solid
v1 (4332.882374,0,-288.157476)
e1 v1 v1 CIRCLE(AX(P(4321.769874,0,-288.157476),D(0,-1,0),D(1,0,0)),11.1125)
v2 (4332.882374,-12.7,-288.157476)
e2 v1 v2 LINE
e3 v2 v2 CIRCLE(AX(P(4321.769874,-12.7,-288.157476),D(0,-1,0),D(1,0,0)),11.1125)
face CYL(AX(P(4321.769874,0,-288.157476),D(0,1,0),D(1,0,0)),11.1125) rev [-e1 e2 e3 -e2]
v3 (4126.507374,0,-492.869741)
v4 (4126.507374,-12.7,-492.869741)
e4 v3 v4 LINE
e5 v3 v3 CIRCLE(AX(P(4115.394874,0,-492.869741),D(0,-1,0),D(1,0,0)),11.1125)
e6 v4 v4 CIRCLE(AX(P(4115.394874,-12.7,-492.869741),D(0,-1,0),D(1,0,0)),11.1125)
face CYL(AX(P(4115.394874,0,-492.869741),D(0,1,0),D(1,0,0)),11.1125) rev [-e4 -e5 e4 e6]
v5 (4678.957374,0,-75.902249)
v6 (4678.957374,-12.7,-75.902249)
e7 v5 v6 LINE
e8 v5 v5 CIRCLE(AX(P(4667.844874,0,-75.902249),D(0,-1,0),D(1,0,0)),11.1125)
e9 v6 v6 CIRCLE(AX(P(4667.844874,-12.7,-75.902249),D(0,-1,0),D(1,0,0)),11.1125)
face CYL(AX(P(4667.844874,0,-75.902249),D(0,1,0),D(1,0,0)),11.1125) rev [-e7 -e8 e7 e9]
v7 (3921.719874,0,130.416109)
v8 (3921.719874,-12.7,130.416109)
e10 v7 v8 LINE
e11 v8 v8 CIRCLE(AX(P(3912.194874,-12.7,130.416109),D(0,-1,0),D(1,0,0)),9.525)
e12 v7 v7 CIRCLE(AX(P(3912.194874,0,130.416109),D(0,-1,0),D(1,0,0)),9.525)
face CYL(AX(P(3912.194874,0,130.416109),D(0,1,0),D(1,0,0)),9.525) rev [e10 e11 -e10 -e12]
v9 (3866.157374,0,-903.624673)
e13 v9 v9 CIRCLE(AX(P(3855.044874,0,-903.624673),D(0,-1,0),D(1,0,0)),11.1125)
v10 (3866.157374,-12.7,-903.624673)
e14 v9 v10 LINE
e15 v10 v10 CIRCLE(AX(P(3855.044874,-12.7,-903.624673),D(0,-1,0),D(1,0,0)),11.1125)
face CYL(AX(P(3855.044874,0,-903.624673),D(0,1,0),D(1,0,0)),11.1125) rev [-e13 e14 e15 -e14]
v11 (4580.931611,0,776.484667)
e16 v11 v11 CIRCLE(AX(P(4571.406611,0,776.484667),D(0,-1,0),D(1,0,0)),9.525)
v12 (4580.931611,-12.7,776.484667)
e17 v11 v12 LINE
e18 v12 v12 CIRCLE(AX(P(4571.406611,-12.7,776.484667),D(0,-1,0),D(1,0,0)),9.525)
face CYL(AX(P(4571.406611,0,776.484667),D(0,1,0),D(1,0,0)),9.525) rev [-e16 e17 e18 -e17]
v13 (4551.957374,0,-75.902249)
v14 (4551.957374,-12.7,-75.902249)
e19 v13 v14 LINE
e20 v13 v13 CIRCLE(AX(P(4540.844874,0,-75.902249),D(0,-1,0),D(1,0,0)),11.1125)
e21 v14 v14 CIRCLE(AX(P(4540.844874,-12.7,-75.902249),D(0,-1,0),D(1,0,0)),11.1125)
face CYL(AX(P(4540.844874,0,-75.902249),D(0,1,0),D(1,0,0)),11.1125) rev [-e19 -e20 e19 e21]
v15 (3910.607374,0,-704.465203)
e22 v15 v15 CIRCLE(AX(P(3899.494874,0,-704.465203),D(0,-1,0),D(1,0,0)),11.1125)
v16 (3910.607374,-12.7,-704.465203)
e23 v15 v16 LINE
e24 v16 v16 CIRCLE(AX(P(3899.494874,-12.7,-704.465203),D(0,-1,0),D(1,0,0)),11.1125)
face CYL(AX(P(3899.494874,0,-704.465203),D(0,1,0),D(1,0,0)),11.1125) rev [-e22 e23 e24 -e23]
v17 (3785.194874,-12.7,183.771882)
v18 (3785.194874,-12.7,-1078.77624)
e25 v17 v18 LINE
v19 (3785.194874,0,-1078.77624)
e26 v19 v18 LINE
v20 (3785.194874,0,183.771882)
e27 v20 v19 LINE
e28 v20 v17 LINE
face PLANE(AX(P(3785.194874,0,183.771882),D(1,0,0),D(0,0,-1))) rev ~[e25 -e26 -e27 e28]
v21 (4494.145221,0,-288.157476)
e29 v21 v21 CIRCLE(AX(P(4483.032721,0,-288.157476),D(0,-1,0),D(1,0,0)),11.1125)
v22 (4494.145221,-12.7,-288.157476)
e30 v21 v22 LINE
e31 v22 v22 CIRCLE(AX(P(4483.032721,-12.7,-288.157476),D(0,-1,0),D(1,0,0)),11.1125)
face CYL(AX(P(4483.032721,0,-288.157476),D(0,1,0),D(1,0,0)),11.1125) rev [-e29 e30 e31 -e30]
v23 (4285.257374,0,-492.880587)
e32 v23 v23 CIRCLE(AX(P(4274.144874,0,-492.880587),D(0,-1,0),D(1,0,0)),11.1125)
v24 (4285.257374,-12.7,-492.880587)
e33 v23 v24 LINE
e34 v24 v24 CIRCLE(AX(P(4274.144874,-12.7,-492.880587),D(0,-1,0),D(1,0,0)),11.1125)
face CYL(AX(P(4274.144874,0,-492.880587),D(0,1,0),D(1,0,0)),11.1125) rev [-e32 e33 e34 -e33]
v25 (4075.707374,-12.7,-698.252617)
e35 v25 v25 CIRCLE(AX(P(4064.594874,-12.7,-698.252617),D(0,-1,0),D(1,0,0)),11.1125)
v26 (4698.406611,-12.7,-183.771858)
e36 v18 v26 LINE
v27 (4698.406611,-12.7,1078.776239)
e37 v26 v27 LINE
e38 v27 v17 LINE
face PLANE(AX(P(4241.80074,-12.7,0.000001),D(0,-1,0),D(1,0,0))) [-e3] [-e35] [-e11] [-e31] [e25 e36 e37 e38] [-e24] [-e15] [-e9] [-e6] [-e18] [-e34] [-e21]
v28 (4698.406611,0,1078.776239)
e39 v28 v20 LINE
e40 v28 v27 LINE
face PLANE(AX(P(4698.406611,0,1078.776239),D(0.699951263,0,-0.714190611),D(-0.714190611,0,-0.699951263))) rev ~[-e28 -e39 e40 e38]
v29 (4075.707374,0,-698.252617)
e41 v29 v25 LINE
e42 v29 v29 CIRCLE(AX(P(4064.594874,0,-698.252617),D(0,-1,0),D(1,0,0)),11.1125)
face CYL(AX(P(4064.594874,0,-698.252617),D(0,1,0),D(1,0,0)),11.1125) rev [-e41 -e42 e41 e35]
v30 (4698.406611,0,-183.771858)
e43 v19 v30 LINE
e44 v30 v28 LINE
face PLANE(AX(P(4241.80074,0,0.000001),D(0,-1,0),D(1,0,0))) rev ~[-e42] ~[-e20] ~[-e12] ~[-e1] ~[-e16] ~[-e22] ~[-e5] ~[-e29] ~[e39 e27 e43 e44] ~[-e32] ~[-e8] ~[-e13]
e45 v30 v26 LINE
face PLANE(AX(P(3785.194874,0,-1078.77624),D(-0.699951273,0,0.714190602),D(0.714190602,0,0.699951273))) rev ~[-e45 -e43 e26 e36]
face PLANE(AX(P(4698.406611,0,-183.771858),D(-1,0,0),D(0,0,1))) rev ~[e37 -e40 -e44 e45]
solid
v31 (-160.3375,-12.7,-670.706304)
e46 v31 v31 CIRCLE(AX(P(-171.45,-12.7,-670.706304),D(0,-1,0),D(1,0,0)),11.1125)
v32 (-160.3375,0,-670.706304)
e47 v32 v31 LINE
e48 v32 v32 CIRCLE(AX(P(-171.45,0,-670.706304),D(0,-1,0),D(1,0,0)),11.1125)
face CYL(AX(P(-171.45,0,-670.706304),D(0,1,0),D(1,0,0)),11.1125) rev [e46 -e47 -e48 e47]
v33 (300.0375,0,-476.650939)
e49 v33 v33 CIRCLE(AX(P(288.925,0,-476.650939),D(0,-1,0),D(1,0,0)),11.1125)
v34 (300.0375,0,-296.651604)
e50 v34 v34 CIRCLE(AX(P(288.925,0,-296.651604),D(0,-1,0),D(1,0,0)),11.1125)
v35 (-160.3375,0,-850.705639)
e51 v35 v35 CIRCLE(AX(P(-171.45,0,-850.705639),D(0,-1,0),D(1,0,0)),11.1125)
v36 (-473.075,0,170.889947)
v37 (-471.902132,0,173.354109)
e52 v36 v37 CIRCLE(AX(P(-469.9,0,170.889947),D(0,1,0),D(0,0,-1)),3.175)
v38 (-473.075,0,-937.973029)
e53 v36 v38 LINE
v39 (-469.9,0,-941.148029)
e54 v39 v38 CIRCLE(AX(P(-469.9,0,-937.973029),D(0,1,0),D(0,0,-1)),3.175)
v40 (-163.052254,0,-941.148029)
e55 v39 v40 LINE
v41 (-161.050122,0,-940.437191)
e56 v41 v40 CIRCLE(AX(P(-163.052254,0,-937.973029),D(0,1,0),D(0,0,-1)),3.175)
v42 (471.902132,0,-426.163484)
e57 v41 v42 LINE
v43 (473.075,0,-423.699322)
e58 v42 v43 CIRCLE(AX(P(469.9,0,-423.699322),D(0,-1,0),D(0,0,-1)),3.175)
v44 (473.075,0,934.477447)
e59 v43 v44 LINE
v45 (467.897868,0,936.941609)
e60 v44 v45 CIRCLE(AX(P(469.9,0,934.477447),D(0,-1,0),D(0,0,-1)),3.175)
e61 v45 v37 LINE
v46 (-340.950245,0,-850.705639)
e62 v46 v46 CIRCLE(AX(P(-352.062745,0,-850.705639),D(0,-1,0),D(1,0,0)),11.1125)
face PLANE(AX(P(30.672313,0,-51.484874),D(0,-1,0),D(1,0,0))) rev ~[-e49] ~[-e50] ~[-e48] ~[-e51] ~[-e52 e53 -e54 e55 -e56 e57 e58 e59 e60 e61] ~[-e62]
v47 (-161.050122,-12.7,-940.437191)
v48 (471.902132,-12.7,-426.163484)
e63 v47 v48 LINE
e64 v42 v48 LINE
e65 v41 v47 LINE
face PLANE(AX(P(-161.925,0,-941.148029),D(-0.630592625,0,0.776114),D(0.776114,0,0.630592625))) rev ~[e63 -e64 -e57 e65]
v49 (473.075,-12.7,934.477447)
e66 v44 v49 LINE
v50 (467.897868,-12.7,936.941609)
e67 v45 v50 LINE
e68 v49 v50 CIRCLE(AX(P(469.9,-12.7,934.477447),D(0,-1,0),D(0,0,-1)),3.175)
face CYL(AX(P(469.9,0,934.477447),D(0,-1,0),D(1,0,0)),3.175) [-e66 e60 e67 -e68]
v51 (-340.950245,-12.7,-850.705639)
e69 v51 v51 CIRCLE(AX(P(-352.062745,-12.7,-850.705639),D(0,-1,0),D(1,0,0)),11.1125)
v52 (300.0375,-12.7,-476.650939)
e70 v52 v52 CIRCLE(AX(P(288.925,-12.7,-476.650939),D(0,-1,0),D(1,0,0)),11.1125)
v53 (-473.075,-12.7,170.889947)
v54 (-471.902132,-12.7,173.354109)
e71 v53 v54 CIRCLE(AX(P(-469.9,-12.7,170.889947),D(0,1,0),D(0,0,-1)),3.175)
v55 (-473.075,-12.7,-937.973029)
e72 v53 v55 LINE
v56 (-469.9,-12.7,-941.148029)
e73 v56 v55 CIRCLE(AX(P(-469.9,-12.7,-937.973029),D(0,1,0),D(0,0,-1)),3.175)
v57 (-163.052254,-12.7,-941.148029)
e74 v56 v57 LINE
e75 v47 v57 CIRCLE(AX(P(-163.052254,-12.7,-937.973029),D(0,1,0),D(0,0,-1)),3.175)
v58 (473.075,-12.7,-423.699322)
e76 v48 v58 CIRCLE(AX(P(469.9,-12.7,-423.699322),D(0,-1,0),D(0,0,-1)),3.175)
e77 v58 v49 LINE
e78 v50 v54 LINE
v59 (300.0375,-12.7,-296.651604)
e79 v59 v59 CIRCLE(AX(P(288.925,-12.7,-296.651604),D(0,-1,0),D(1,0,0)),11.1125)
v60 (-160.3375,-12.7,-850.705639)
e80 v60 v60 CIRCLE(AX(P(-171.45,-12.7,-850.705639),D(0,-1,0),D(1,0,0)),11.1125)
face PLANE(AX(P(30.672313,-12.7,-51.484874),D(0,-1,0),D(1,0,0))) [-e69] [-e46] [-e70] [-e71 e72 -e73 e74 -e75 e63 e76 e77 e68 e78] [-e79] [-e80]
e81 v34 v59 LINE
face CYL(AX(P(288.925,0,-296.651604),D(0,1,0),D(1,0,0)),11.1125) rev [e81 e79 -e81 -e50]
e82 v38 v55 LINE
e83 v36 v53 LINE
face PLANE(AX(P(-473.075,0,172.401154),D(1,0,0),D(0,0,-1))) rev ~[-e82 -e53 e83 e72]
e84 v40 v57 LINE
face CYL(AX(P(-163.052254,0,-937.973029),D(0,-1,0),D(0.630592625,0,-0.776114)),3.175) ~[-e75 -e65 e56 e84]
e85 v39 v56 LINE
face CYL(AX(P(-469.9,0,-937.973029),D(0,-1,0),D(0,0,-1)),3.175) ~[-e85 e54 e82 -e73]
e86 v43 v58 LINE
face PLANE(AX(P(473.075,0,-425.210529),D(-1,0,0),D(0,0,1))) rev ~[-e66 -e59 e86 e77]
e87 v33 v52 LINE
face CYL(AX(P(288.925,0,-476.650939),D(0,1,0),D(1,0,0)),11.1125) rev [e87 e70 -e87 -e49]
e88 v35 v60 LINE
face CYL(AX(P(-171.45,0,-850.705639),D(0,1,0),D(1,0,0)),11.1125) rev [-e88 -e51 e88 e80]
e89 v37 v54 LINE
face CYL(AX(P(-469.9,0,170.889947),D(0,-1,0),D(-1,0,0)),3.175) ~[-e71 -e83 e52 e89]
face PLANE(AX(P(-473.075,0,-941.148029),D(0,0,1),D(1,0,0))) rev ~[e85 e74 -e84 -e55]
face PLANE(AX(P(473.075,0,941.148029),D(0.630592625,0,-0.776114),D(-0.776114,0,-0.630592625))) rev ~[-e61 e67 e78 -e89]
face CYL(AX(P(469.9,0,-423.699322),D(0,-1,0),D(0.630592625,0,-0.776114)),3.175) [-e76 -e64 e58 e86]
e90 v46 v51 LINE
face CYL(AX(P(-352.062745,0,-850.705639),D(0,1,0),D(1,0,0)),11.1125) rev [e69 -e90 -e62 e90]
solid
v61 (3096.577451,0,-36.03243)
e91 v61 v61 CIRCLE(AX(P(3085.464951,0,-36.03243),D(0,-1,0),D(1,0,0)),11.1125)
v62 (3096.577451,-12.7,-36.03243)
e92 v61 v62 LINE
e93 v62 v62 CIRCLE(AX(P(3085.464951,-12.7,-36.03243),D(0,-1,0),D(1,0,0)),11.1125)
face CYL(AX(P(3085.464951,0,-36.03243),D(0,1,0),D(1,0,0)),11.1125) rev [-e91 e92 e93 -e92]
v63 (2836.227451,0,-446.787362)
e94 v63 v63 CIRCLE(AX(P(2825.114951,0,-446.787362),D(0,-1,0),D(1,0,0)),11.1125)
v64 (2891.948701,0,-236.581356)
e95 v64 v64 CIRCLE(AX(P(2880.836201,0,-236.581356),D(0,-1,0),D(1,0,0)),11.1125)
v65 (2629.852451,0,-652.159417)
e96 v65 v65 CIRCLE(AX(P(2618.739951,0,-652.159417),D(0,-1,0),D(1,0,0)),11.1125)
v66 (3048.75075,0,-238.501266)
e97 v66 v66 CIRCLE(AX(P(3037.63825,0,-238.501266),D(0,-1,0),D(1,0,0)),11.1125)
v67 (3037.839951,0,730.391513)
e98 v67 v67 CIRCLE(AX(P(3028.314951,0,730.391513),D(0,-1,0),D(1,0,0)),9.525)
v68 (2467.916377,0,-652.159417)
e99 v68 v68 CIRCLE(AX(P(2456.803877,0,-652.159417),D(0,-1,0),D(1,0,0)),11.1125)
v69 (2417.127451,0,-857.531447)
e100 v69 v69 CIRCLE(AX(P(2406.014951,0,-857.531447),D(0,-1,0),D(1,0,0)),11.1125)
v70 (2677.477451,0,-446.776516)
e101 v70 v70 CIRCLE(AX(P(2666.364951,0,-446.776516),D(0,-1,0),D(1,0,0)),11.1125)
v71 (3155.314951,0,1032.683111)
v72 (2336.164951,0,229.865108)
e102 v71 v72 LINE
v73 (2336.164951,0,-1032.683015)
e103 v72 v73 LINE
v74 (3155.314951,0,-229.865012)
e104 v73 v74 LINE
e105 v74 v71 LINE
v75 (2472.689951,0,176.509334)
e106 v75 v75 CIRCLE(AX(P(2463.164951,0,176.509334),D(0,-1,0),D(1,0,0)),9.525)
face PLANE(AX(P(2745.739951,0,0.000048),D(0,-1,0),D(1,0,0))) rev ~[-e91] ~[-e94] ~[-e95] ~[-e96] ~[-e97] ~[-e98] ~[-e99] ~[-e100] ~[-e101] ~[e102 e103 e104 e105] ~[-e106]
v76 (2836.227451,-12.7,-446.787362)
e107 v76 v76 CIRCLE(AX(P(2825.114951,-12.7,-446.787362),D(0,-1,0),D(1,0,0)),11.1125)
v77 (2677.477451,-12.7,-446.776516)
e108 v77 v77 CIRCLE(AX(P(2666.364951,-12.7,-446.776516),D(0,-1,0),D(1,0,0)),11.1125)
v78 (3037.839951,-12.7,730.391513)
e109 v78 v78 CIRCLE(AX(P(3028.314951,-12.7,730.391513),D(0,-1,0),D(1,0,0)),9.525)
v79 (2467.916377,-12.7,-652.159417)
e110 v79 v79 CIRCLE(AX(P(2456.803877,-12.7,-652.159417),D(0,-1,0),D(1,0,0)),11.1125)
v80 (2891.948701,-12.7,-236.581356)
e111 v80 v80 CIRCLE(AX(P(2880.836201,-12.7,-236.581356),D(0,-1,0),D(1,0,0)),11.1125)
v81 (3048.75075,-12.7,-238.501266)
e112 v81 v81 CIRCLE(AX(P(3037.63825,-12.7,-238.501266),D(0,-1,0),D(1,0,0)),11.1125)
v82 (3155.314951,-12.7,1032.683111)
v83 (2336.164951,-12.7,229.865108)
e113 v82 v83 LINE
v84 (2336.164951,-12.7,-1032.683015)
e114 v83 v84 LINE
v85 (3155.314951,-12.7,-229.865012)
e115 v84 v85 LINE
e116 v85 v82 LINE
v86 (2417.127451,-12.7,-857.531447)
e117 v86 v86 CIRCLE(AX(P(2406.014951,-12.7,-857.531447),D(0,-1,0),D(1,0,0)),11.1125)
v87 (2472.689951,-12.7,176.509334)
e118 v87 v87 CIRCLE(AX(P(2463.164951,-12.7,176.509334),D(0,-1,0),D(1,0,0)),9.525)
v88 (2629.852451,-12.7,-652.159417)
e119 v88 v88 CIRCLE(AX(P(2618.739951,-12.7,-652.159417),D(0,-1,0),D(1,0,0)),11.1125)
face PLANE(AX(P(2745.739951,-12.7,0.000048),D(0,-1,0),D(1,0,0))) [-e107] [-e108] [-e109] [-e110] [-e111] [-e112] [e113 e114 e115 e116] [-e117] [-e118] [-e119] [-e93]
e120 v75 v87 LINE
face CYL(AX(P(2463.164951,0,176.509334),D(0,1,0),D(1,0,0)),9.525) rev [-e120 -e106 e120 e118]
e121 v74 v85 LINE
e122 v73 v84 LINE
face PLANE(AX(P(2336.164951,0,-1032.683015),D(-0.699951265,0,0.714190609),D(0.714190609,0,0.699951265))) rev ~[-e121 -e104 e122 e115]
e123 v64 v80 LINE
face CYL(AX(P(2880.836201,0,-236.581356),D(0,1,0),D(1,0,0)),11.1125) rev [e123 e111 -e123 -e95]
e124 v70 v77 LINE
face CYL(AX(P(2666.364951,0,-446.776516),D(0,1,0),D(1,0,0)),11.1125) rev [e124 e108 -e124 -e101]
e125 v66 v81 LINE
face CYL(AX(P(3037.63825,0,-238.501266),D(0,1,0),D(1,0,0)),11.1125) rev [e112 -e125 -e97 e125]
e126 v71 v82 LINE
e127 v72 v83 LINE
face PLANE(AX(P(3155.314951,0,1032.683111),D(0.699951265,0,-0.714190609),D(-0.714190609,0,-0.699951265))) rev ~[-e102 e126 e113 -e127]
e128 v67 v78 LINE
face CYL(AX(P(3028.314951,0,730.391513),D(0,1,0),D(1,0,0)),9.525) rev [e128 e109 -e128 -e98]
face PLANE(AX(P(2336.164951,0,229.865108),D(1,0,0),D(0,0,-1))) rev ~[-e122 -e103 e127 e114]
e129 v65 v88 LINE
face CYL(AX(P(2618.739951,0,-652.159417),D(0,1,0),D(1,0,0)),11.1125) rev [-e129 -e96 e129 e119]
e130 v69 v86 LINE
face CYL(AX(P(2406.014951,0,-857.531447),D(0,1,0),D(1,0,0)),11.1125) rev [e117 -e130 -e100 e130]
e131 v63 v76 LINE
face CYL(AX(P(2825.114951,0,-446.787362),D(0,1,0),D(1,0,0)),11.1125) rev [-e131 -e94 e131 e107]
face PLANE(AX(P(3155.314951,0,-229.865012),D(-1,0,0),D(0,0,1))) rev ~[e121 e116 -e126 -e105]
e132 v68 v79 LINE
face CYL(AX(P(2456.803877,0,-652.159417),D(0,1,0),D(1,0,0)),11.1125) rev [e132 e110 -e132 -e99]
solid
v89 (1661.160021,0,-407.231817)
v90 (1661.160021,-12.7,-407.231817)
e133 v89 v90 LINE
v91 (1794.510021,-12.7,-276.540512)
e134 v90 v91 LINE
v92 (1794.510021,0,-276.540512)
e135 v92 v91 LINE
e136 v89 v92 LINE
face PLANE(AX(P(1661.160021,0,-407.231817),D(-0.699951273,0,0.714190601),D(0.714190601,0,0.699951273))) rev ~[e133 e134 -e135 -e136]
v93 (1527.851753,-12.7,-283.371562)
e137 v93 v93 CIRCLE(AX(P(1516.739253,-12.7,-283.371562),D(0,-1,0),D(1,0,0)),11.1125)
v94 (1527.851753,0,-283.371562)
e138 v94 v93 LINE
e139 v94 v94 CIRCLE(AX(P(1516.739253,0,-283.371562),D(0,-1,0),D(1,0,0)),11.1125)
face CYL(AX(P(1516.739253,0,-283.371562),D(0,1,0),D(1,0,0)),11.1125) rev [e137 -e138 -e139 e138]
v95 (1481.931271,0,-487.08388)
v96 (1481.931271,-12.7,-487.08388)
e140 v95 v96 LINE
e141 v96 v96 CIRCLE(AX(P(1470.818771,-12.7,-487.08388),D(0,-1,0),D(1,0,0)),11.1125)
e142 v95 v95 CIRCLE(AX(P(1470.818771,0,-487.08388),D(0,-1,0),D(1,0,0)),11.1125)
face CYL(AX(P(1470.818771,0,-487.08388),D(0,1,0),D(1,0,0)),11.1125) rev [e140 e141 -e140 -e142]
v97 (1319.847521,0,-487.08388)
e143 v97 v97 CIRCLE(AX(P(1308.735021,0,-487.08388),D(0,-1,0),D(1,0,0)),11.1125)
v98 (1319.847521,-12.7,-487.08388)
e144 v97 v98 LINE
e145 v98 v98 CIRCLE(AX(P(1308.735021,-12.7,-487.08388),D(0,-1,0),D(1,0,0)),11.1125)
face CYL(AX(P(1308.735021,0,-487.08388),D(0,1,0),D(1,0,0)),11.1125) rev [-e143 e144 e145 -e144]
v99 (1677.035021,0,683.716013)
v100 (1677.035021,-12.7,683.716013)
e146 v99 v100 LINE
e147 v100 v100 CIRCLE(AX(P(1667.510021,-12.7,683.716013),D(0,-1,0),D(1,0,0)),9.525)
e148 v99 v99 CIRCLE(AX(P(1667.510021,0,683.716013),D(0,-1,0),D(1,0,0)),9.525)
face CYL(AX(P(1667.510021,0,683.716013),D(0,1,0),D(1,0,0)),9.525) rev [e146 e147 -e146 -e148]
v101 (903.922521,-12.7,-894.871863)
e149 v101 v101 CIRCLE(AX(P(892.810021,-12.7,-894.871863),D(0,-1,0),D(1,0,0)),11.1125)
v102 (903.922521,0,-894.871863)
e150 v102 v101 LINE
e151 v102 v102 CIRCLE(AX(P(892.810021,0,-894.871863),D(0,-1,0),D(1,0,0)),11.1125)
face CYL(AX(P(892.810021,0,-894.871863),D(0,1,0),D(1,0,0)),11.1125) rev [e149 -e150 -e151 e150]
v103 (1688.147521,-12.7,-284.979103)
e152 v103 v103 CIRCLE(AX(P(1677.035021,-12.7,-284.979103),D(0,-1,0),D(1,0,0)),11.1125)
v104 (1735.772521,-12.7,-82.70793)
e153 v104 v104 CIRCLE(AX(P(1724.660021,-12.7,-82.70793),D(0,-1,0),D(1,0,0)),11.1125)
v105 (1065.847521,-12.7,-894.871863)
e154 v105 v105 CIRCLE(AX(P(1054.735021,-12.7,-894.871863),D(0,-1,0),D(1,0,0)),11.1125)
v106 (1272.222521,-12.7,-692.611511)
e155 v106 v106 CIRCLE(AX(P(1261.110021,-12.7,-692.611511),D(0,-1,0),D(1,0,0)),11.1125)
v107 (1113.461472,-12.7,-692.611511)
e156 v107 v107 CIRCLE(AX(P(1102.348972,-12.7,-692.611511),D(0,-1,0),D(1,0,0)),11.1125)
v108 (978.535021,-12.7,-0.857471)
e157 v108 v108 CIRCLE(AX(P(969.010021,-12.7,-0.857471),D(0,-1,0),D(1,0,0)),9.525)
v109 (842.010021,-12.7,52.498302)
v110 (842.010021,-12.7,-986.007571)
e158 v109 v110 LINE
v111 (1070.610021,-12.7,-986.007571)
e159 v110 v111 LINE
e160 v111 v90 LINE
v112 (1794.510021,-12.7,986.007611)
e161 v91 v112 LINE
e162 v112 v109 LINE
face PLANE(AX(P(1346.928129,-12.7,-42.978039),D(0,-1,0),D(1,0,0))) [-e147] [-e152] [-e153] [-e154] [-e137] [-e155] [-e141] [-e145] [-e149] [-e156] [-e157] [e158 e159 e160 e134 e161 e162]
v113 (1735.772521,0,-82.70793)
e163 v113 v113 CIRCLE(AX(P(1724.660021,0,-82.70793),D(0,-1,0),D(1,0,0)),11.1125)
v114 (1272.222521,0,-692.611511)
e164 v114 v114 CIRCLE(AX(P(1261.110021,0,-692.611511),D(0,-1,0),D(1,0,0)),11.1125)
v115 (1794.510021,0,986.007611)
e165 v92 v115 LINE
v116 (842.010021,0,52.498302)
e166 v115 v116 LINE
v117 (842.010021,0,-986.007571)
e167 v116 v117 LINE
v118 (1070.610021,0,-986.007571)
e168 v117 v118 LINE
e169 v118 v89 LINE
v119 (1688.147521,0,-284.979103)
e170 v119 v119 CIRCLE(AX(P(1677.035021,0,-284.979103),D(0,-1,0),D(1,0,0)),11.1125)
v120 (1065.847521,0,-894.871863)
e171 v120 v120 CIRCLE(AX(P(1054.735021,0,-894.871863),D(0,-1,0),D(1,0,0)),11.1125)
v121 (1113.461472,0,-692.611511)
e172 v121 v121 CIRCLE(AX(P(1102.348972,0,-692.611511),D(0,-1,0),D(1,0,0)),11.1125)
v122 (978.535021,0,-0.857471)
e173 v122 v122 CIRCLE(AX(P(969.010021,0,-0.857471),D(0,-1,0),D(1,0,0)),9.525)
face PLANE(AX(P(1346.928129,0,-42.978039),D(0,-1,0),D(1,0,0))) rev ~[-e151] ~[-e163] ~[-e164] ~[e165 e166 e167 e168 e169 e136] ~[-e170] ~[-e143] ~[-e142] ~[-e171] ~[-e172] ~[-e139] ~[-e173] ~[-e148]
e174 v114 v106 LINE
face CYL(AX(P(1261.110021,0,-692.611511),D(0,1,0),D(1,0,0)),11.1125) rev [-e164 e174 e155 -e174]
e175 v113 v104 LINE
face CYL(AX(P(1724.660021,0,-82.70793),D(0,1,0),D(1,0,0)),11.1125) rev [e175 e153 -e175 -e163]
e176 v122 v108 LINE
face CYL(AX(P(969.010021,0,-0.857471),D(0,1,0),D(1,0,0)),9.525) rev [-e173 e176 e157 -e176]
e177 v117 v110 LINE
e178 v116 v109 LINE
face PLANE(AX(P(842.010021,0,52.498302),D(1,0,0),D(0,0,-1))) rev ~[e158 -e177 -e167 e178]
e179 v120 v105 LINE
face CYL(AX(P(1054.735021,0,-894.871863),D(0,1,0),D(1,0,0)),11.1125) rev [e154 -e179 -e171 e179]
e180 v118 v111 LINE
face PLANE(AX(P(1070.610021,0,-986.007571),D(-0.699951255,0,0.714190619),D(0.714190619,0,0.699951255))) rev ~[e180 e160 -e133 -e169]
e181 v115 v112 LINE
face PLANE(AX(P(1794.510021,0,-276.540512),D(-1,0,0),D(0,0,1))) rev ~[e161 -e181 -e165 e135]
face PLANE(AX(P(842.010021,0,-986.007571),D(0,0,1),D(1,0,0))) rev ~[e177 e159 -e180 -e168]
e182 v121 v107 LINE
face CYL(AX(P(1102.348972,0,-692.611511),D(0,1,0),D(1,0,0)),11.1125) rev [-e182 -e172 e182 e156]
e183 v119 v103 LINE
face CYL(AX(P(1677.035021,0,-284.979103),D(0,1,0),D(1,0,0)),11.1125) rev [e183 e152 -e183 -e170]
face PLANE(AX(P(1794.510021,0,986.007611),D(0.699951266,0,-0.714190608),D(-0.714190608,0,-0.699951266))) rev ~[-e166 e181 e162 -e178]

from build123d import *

# Parameters (mm, degrees)
F0_R     = 11.1125
F1_DEPTH = 12.7
F2_R     = 3.175
F3_R     = 11.1125
F3_R_2   = 9.525
F4_DEPTH = 12.7
F5_R     = 11.1125
F5_R_2   = 9.525
F6_DEPTH = 12.7
F7_R     = 11.1125
F7_R_2   = 9.525
F8_DEPTH = 12.7


# Not quite as in the source:
# - ends of sketch curves that miss each other by under 0.0002 mm in the source are joined


with BuildPart() as f1:
    # F0 (on Front) → F1 (new body)
    with BuildSketch(Plane.XZ):
        Polygon((-161.925, -941.1480288), (473.075, -425.2105288), (473.075, 941.1480288), (-473.075, 172.4011538), (-473.075, -941.1480288), align=None)
        with Locations((-352.0627452, -850.7056392)):
            Circle(F0_R, mode=Mode.SUBTRACT)
        with Locations((-171.45, -850.7056392)):
            Circle(F0_R, mode=Mode.SUBTRACT)
        with Locations((-171.45, -670.706304)):
            Circle(F0_R, mode=Mode.SUBTRACT)
        with Locations((288.925, -476.650939)):
            Circle(F0_R, mode=Mode.SUBTRACT)
        with Locations((288.925, -296.6516038)):
            Circle(F0_R, mode=Mode.SUBTRACT)
    extrude(amount=F1_DEPTH)

    # F2
    f2_edges = [f1.edges().sort_by_distance(p)[0] for p in [
        (473.075, -6.35, 941.148029),
        (-473.075, -6.35, 172.401154),
        (-473.075, -6.35, -941.148029),
        (-161.925, -6.35, -941.148029),
        (473.075, -6.35, -425.210529),
    ]]
    fillet(f2_edges, radius=F2_R)


with BuildPart() as f4:
    # F3 (on Front) → F4 (new body)
    with BuildSketch(Plane.XZ):
        Polygon((1070.6100212097, -986.0075712204), (1661.1600212097, -407.2318174204), (1794.5100212097, -276.5405116204), (1794.5100212097, 986.0076109796), (842.0100212097, 52.4983019796), (842.0100212097, -986.0075712204), align=None)
        with Locations((892.8100212097, -894.8718632204)):
            Circle(F3_R, mode=Mode.SUBTRACT)
        with Locations((1054.7350212097, -894.8718632204)):
            Circle(F3_R, mode=Mode.SUBTRACT)
        with Locations((1102.3489722097, -692.6115108204)):
            Circle(F3_R, mode=Mode.SUBTRACT)
        with Locations((1261.1100212097, -692.6115108204)):
            Circle(F3_R, mode=Mode.SUBTRACT)
        with Locations((969.0100212097, -0.8574714204)):
            Circle(F3_R_2, mode=Mode.SUBTRACT)
        with Locations((1308.7350212097, -487.0838802204)):
            Circle(F3_R, mode=Mode.SUBTRACT)
        with Locations((1470.8187712097, -487.0838802204)):
            Circle(F3_R, mode=Mode.SUBTRACT)
        with Locations((1516.7392534097, -283.3715622204)):
            Circle(F3_R, mode=Mode.SUBTRACT)
        with Locations((1677.0350212097, -284.9791028204)):
            Circle(F3_R, mode=Mode.SUBTRACT)
        with Locations((1724.6600212097, -82.7079300204)):
            Circle(F3_R, mode=Mode.SUBTRACT)
        with Locations((1667.5100212097, 683.7160133796)):
            Circle(F3_R_2, mode=Mode.SUBTRACT)
    extrude(amount=F4_DEPTH)


with BuildPart() as f6:
    # F5 (on Front) → F6 (new body)
    with BuildSketch(Plane.XZ):
        Polygon((2336.1649513245, -1032.6830148697), (3155.3149513245, -229.8650116697), (3155.3149513245, 1032.6831109303), (2336.1649513245, 229.8651077303), align=None)
        with Locations((2406.0149513245, -857.5314474697)):
            Circle(F5_R, mode=Mode.SUBTRACT)
        with Locations((2456.8038769245, -652.1594172697)):
            Circle(F5_R, mode=Mode.SUBTRACT)
        with Locations((2618.7399513245, -652.1594172697)):
            Circle(F5_R, mode=Mode.SUBTRACT)
        with Locations((2666.3649513245, -446.7765158697)):
            Circle(F5_R, mode=Mode.SUBTRACT)
        with Locations((2825.1149513245, -446.7873616697)):
            Circle(F5_R, mode=Mode.SUBTRACT)
        with Locations((2880.8362013245, -236.5813558697)):
            Circle(F5_R, mode=Mode.SUBTRACT)
        with Locations((3037.6382499245, -238.5012656697)):
            Circle(F5_R, mode=Mode.SUBTRACT)
        with Locations((3085.4649513245, -36.0324300697)):
            Circle(F5_R, mode=Mode.SUBTRACT)
        with Locations((2463.1649513245, 176.5093343303)):
            Circle(F5_R_2, mode=Mode.SUBTRACT)
        with Locations((3028.3149513245, 730.3915133303)):
            Circle(F5_R_2, mode=Mode.SUBTRACT)
    extrude(amount=F6_DEPTH)


with BuildPart() as f8:
    # F7 (on Front) → F8 (new body)
    with BuildSketch(Plane.XZ):
        Polygon((3785.1948738098, -1078.7762403488), (4698.4066110098, -183.7718581488), (4698.4066110098, 1078.7762390512), (3785.1948738098, 183.7718822512), align=None)
        with Locations((3855.0448738098, -903.6246729488)):
            Circle(F7_R, mode=Mode.SUBTRACT)
        with Locations((3899.4948738098, -704.4652033488)):
            Circle(F7_R, mode=Mode.SUBTRACT)
        with Locations((4064.5948738098, -698.2526173488)):
            Circle(F7_R, mode=Mode.SUBTRACT)
        with Locations((4115.3948738098, -492.8697413488)):
            Circle(F7_R, mode=Mode.SUBTRACT)
        with Locations((4274.1448738098, -492.8805871488)):
            Circle(F7_R, mode=Mode.SUBTRACT)
        with Locations((4321.7698738098, -288.1574761488)):
            Circle(F7_R, mode=Mode.SUBTRACT)
        with Locations((4483.0327212098, -288.1574761488)):
            Circle(F7_R, mode=Mode.SUBTRACT)
        with Locations((4540.8448738098, -75.9022491488)):
            Circle(F7_R, mode=Mode.SUBTRACT)
        with Locations((4667.8448738098, -75.9022491488)):
            Circle(F7_R, mode=Mode.SUBTRACT)
        with Locations((3912.1948738098, 130.4161088512)):
            Circle(F7_R_2, mode=Mode.SUBTRACT)
        with Locations((4571.4066110098, 776.4846668512)):
            Circle(F7_R_2, mode=Mode.SUBTRACT)
    extrude(amount=F8_DEPTH)


solid = Compound([f1.part, f4.part, f6.part, f8.part])
